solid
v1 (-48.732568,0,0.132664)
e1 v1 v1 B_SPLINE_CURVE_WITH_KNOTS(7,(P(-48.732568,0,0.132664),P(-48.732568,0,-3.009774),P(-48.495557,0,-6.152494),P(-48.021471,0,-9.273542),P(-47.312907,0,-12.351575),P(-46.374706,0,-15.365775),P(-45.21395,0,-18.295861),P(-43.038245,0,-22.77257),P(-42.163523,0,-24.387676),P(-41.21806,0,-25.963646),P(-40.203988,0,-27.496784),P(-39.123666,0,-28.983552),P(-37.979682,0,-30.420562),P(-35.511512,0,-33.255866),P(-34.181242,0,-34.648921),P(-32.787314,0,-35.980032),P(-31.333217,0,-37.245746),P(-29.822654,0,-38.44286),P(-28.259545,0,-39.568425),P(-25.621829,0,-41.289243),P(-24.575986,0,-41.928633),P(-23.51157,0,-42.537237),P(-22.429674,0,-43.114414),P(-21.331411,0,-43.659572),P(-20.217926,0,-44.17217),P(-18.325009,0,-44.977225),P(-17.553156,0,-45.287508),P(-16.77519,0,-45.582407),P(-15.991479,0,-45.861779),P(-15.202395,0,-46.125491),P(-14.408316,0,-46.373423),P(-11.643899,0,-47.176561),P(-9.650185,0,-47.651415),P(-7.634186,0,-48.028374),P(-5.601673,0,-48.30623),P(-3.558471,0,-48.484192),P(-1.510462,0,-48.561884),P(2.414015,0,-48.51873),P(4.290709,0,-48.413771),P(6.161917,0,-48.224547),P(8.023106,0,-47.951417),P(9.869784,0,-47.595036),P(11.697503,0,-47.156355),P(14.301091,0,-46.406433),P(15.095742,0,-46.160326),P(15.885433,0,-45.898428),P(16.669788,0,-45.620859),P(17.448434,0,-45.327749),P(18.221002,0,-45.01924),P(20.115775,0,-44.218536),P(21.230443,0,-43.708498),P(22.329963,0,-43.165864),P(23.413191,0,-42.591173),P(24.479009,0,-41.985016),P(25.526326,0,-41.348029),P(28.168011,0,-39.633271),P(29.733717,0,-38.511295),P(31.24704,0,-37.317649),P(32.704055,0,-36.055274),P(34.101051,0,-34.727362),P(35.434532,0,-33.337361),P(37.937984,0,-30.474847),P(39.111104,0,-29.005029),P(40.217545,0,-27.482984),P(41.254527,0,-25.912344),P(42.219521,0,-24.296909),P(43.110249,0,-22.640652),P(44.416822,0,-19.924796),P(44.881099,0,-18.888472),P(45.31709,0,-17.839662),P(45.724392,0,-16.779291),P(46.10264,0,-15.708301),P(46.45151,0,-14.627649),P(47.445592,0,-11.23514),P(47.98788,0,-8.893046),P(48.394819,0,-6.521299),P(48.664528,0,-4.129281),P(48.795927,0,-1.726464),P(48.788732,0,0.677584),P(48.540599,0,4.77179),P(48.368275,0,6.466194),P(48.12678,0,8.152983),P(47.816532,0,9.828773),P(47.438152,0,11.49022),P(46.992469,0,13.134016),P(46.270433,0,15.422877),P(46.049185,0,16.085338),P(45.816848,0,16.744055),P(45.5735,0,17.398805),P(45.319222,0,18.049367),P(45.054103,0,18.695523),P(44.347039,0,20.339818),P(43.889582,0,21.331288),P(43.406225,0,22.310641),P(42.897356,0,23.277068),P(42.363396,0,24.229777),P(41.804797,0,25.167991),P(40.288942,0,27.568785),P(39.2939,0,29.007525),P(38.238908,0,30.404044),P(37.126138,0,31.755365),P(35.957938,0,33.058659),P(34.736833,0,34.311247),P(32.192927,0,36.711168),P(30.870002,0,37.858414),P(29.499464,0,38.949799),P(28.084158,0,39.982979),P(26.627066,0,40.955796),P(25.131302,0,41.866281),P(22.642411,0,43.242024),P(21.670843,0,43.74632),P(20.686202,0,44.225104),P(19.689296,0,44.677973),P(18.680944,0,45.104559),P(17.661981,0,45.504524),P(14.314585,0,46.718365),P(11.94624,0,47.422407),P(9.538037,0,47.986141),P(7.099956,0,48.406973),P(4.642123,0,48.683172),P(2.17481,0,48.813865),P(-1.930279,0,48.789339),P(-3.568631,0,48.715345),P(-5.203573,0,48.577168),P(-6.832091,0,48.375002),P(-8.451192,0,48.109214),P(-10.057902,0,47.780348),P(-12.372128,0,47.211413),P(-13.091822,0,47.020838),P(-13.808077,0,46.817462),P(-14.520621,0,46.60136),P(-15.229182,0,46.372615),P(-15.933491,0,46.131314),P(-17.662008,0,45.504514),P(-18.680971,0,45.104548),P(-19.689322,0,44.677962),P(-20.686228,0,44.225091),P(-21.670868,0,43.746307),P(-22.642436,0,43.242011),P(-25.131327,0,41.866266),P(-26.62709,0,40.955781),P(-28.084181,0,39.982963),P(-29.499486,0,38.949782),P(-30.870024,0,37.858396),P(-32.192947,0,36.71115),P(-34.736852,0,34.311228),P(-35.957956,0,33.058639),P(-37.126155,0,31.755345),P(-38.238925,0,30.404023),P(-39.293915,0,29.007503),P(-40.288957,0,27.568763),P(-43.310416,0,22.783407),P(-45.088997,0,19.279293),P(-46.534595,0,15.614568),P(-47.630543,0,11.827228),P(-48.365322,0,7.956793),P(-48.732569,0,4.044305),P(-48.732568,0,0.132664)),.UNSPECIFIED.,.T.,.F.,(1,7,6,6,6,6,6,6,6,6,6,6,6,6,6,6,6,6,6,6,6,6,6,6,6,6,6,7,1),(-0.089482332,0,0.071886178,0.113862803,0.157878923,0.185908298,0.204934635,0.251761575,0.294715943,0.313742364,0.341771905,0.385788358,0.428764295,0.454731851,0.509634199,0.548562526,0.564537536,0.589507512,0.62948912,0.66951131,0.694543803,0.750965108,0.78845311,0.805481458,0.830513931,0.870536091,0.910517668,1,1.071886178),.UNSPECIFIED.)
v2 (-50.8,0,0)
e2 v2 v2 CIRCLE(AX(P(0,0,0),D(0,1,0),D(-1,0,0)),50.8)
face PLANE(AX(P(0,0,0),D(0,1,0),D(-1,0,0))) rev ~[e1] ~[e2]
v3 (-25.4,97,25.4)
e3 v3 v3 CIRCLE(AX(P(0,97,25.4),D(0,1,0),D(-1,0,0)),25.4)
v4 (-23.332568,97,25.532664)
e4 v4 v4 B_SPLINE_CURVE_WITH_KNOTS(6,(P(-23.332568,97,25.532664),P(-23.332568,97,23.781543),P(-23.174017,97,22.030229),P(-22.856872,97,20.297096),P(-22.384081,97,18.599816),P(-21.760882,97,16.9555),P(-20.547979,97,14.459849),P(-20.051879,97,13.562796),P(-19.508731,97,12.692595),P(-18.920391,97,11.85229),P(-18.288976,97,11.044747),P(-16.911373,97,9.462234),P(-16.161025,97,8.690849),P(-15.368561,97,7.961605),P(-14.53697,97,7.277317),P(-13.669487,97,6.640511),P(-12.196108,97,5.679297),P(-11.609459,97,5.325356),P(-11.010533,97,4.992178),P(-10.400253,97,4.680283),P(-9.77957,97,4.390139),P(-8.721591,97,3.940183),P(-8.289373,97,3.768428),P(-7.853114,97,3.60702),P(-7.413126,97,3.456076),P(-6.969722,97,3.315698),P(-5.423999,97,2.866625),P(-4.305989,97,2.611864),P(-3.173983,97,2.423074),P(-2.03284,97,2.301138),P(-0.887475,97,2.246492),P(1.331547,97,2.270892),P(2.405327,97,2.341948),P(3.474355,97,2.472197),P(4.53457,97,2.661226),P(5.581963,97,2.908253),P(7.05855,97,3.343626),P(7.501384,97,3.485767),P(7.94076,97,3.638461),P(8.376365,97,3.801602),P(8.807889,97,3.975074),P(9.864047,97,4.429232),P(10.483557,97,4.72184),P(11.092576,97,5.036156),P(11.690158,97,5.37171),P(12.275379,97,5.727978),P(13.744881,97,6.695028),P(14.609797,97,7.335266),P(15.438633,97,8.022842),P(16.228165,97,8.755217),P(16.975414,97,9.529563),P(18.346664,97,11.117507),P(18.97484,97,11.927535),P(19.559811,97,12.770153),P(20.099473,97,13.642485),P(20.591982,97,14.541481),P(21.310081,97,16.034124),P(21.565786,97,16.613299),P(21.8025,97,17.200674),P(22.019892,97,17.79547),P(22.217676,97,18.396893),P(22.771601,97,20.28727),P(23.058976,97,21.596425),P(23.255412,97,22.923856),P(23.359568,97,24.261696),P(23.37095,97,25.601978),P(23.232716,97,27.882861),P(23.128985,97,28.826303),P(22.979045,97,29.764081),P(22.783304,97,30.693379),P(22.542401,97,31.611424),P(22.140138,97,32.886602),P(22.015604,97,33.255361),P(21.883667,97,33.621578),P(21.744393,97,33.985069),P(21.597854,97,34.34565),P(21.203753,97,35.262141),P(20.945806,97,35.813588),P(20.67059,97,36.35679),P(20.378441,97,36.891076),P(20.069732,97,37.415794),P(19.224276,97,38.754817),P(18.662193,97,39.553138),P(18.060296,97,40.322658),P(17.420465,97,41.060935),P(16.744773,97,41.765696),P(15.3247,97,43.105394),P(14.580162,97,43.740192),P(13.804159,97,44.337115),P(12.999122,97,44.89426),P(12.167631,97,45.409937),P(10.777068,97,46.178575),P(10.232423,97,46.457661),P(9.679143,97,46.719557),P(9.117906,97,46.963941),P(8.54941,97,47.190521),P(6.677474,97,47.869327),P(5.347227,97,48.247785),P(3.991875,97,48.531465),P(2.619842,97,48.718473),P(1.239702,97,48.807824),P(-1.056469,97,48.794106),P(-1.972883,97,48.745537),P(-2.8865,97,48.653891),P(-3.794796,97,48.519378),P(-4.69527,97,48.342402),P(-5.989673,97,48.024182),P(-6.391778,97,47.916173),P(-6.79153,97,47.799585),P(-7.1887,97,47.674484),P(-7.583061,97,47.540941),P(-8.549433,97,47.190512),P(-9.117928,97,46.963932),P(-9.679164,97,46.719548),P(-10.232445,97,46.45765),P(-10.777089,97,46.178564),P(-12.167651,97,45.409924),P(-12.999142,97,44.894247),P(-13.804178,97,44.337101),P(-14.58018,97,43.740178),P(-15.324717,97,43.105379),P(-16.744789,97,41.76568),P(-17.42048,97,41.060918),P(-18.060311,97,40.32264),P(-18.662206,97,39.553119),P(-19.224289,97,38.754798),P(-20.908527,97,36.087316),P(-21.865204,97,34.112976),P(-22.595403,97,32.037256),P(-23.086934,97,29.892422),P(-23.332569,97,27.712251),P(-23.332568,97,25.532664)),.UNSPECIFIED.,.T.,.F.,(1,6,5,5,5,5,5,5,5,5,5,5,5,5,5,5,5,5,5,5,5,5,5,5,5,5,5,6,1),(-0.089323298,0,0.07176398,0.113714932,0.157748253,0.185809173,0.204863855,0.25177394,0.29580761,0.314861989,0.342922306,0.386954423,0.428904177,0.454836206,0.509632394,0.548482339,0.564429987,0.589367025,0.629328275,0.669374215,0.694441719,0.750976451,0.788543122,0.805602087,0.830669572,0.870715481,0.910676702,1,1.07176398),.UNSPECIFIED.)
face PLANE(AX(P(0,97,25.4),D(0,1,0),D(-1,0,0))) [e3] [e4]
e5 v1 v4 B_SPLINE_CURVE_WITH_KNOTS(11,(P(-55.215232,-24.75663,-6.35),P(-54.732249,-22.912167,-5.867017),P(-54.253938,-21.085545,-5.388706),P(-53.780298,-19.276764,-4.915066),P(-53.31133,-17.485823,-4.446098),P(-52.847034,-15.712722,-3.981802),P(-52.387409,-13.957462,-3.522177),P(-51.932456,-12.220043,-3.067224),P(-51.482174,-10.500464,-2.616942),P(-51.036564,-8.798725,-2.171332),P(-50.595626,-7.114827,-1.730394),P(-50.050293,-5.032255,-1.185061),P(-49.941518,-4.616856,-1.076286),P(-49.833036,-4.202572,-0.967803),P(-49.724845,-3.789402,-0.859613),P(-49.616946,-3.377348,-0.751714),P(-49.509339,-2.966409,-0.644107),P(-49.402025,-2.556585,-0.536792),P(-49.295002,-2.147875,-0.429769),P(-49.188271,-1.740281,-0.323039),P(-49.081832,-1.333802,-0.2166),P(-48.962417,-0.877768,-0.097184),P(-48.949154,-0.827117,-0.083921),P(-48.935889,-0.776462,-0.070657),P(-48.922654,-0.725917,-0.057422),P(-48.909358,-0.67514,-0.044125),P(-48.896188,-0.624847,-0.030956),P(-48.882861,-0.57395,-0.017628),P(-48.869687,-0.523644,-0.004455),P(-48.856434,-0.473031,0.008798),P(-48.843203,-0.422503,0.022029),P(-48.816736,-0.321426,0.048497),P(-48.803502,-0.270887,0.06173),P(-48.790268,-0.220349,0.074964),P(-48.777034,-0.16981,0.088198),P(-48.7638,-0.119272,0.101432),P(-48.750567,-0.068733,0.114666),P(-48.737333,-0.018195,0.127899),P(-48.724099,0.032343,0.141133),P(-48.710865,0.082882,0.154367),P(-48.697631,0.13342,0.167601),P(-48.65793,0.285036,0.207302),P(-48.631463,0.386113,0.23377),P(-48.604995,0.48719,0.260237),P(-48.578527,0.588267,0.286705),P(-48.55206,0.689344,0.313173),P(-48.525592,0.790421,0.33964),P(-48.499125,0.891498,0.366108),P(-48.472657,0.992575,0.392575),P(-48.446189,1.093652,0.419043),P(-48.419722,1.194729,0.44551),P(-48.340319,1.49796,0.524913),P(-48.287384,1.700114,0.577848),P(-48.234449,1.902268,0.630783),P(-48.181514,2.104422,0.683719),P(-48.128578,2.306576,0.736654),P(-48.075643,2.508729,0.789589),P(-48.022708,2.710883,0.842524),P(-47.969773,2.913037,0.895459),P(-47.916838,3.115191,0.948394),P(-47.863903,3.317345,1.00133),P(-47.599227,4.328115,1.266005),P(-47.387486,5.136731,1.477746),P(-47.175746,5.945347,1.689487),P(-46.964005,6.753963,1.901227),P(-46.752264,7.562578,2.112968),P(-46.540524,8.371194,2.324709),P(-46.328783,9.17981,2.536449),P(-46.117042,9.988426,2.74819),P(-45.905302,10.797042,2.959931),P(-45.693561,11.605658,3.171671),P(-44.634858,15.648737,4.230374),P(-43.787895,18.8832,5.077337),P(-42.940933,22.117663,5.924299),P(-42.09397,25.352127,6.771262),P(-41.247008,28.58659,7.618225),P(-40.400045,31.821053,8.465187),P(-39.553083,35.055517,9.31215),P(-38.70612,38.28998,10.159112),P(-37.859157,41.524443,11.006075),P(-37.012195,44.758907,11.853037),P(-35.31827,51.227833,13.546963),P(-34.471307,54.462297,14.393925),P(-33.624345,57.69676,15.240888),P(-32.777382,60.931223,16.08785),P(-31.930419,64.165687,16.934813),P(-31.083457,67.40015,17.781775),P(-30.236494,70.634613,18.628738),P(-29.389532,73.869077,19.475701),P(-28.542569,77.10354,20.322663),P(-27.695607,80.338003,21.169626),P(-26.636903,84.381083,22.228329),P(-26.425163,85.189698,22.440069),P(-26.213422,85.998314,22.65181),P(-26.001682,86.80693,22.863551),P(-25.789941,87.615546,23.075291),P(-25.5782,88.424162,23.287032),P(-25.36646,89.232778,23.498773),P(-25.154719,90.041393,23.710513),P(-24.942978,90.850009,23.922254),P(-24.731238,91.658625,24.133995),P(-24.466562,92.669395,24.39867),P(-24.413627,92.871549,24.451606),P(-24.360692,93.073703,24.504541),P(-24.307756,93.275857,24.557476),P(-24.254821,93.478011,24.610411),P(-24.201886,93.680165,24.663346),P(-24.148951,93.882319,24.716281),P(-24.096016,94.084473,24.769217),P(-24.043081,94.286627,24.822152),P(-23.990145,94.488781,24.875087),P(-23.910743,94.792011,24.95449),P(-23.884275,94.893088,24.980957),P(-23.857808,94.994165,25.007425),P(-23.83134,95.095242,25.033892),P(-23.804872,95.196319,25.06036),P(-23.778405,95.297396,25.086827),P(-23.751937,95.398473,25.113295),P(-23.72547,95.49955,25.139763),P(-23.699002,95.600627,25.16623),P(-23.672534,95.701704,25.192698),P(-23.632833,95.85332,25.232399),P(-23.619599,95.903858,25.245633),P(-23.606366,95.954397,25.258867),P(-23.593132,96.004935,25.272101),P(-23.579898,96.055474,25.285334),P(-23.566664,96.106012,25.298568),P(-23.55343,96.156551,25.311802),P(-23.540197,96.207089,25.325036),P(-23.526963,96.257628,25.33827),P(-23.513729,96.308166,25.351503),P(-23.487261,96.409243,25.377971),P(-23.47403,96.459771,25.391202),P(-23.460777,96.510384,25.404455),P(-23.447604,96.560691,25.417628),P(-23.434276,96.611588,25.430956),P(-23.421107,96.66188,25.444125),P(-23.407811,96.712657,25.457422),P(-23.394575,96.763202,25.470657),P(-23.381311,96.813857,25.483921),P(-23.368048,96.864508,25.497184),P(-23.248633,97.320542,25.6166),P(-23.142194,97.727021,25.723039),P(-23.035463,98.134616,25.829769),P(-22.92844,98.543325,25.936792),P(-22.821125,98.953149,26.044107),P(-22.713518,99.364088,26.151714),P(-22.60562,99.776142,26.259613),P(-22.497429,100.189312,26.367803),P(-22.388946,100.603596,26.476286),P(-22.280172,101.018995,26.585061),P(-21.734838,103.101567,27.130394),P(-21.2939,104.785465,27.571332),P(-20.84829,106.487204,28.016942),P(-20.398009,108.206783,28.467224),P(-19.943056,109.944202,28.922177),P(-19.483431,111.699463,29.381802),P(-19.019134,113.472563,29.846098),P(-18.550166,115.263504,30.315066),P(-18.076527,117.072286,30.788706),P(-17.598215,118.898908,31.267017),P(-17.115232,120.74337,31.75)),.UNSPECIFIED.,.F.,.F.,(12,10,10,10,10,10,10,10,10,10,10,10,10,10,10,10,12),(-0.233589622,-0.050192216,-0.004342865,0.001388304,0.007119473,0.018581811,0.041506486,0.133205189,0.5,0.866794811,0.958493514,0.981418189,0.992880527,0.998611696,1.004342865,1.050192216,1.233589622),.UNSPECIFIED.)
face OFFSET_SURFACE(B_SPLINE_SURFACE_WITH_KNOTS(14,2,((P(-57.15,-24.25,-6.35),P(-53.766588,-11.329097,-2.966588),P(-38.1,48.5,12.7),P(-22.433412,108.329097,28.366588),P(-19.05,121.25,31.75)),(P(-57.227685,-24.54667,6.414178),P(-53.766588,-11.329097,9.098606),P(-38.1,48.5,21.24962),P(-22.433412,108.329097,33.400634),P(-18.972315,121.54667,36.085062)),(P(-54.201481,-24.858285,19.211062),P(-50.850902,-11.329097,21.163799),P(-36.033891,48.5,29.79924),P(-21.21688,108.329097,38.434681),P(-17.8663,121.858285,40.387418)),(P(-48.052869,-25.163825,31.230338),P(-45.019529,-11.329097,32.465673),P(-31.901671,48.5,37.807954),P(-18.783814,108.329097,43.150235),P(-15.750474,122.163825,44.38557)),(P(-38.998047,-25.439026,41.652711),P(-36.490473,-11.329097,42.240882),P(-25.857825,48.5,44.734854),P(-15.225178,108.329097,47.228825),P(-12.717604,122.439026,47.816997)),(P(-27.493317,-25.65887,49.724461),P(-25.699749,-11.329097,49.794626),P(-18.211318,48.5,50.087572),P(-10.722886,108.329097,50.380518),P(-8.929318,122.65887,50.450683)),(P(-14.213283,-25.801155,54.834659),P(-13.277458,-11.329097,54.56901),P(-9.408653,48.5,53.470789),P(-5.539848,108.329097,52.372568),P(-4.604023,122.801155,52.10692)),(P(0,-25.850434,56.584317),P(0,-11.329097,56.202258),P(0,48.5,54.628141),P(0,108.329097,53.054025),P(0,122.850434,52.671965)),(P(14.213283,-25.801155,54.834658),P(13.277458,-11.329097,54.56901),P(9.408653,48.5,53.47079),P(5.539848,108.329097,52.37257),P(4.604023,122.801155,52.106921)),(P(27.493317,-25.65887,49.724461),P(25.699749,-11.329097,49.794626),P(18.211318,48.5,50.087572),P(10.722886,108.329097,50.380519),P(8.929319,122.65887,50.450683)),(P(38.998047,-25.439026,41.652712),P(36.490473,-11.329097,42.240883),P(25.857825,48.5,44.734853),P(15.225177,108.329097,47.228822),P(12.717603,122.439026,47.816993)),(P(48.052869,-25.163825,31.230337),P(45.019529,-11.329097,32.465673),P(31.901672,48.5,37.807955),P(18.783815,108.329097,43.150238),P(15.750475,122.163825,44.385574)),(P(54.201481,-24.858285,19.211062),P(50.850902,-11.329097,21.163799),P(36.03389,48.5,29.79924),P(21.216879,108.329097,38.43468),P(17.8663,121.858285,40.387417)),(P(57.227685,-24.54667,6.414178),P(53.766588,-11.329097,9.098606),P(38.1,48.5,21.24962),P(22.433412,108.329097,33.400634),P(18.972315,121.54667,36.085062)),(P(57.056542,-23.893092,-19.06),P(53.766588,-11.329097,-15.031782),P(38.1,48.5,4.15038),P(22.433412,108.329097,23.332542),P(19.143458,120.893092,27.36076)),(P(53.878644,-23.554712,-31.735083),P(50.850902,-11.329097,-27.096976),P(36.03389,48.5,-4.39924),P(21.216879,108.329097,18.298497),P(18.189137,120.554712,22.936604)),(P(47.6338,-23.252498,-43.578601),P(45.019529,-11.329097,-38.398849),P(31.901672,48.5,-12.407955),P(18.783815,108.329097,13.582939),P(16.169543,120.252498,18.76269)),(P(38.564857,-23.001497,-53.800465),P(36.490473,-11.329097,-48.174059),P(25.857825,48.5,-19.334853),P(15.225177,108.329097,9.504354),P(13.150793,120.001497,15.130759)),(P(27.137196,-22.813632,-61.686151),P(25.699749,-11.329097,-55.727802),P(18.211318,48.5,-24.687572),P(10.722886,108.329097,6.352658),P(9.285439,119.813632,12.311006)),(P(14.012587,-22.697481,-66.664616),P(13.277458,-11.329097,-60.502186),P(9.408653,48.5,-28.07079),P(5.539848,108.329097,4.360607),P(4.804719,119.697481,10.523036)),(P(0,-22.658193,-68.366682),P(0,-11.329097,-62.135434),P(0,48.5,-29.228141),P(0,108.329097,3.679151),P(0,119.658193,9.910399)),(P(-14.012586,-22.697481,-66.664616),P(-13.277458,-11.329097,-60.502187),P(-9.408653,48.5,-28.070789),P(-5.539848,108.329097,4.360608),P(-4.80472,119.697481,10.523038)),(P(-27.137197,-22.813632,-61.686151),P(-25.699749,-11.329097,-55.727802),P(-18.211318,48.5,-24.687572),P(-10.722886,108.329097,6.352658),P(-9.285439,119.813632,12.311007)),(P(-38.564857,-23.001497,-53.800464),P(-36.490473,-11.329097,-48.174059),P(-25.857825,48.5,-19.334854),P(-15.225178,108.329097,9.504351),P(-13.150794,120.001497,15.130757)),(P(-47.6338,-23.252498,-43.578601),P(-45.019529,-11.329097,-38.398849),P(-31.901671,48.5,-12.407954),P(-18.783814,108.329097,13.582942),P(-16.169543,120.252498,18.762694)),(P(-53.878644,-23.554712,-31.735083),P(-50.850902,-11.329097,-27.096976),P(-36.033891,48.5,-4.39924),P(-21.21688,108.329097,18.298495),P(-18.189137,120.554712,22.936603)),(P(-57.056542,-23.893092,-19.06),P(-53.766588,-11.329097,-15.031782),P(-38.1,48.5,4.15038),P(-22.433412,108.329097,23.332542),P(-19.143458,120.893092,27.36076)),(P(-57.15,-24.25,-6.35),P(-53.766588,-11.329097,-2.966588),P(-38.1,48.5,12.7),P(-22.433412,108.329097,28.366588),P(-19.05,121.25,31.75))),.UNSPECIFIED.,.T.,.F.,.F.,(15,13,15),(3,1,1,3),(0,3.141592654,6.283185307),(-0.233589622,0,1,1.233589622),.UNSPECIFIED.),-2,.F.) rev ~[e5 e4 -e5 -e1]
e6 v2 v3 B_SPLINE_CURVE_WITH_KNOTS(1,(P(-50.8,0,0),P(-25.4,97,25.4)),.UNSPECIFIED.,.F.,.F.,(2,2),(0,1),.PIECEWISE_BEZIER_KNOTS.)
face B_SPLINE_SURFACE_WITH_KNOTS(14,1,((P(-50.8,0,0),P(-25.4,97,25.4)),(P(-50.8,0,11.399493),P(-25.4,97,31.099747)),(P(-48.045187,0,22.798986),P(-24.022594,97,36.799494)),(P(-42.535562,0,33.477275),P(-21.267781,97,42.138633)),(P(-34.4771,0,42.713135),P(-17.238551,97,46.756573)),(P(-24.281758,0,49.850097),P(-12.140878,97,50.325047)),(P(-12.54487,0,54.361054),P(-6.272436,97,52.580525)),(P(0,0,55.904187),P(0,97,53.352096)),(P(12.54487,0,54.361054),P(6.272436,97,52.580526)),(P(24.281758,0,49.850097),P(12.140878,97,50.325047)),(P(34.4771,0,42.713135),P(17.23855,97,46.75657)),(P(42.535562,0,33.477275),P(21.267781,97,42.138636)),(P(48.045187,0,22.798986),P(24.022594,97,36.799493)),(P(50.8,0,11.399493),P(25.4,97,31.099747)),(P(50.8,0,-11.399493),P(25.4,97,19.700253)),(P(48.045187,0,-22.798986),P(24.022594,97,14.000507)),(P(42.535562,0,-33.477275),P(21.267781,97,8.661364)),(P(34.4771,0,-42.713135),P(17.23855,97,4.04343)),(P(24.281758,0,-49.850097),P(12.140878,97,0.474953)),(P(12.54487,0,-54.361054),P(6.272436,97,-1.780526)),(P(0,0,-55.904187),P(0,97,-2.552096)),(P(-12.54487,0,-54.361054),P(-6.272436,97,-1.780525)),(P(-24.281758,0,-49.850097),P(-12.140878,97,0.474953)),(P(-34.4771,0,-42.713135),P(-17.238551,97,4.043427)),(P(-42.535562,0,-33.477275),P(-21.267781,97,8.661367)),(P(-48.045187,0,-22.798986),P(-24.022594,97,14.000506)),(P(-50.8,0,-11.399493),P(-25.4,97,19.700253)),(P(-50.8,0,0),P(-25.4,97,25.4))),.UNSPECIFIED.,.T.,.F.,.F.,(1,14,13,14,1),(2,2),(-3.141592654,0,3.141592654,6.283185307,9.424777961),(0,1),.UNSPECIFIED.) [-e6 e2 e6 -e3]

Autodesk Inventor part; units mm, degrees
ref_plane "YZ Plane" through (0, 0, 0) normal (1, 0, 0) x (0, 1, 0)
ref_plane "XY Plane" through (0, 0, 0) normal (0, 0, 1) x (1, 0, 0)
sketch "Szkic6" plane through (0, 0, 0) normal (0, 1, 0) x (-1, 0, 0)
  circle A0 centre (0, 0) radius 50.8
  dimension "d33" = 101.6
ref_plane "Płaszczyzna konstrukcyjna1" through (0, 97, 0) normal (0, 1, 0) x (-1, 0, 0)
sketch "Szkic7" plane through (0, 97, 0) normal (0, 1, 0) x (-1, 0, 0)
  circle A0 centre (0, 25.4) radius 25.4
  line L0 (0, -20.3) -> (0, 20.3) construction
  circle A1 centre (0, 0) radius 50.8 construction
  dimension "d35" = 50.8
loft "Wyciągnięcie złożone1" add profiles "Szkic6", "Szkic7"
shell "Skorupa1" thickness 2 removed faces 2 at (-4.0858, 97, 24.3929) at (7.3018, 0, 11.5135)
equation "\"d33\" = OD1"
equation "\"d35\" = OD2"
equation "\"d52\" = THK"
equation "\"SzerokośćGięciaPodcięcia\" = Grubość"
equation "\"RozmiarPodcięciaNarożnika\" = 4 * Grubość"
equation "\"PromieńPrzejścia\" = PromieńGięcia"
equation "\"Rozmiar_promienia_Jacobiego\" = PromieńGięcia"
equation "\"Wielk_odstępu\" = Grubość"
equation "\"d2\" = PromieńGięcia"
equation "\"d23\" = PromieńGięcia"
equation "\"OD1\" = 101.6"
equation "\"OD2\" = 50.8"
equation "\"L\" = 97"
equation "\"THK\" = 2"
equation "\"d34\" = L"
equation "\"Grubość\" = 1.5"
equation "\"PromieńGięcia\" = 3"
properties part number "Redukcja asymetryczna Ø101,6x50,8x2 L=97" material "304"
